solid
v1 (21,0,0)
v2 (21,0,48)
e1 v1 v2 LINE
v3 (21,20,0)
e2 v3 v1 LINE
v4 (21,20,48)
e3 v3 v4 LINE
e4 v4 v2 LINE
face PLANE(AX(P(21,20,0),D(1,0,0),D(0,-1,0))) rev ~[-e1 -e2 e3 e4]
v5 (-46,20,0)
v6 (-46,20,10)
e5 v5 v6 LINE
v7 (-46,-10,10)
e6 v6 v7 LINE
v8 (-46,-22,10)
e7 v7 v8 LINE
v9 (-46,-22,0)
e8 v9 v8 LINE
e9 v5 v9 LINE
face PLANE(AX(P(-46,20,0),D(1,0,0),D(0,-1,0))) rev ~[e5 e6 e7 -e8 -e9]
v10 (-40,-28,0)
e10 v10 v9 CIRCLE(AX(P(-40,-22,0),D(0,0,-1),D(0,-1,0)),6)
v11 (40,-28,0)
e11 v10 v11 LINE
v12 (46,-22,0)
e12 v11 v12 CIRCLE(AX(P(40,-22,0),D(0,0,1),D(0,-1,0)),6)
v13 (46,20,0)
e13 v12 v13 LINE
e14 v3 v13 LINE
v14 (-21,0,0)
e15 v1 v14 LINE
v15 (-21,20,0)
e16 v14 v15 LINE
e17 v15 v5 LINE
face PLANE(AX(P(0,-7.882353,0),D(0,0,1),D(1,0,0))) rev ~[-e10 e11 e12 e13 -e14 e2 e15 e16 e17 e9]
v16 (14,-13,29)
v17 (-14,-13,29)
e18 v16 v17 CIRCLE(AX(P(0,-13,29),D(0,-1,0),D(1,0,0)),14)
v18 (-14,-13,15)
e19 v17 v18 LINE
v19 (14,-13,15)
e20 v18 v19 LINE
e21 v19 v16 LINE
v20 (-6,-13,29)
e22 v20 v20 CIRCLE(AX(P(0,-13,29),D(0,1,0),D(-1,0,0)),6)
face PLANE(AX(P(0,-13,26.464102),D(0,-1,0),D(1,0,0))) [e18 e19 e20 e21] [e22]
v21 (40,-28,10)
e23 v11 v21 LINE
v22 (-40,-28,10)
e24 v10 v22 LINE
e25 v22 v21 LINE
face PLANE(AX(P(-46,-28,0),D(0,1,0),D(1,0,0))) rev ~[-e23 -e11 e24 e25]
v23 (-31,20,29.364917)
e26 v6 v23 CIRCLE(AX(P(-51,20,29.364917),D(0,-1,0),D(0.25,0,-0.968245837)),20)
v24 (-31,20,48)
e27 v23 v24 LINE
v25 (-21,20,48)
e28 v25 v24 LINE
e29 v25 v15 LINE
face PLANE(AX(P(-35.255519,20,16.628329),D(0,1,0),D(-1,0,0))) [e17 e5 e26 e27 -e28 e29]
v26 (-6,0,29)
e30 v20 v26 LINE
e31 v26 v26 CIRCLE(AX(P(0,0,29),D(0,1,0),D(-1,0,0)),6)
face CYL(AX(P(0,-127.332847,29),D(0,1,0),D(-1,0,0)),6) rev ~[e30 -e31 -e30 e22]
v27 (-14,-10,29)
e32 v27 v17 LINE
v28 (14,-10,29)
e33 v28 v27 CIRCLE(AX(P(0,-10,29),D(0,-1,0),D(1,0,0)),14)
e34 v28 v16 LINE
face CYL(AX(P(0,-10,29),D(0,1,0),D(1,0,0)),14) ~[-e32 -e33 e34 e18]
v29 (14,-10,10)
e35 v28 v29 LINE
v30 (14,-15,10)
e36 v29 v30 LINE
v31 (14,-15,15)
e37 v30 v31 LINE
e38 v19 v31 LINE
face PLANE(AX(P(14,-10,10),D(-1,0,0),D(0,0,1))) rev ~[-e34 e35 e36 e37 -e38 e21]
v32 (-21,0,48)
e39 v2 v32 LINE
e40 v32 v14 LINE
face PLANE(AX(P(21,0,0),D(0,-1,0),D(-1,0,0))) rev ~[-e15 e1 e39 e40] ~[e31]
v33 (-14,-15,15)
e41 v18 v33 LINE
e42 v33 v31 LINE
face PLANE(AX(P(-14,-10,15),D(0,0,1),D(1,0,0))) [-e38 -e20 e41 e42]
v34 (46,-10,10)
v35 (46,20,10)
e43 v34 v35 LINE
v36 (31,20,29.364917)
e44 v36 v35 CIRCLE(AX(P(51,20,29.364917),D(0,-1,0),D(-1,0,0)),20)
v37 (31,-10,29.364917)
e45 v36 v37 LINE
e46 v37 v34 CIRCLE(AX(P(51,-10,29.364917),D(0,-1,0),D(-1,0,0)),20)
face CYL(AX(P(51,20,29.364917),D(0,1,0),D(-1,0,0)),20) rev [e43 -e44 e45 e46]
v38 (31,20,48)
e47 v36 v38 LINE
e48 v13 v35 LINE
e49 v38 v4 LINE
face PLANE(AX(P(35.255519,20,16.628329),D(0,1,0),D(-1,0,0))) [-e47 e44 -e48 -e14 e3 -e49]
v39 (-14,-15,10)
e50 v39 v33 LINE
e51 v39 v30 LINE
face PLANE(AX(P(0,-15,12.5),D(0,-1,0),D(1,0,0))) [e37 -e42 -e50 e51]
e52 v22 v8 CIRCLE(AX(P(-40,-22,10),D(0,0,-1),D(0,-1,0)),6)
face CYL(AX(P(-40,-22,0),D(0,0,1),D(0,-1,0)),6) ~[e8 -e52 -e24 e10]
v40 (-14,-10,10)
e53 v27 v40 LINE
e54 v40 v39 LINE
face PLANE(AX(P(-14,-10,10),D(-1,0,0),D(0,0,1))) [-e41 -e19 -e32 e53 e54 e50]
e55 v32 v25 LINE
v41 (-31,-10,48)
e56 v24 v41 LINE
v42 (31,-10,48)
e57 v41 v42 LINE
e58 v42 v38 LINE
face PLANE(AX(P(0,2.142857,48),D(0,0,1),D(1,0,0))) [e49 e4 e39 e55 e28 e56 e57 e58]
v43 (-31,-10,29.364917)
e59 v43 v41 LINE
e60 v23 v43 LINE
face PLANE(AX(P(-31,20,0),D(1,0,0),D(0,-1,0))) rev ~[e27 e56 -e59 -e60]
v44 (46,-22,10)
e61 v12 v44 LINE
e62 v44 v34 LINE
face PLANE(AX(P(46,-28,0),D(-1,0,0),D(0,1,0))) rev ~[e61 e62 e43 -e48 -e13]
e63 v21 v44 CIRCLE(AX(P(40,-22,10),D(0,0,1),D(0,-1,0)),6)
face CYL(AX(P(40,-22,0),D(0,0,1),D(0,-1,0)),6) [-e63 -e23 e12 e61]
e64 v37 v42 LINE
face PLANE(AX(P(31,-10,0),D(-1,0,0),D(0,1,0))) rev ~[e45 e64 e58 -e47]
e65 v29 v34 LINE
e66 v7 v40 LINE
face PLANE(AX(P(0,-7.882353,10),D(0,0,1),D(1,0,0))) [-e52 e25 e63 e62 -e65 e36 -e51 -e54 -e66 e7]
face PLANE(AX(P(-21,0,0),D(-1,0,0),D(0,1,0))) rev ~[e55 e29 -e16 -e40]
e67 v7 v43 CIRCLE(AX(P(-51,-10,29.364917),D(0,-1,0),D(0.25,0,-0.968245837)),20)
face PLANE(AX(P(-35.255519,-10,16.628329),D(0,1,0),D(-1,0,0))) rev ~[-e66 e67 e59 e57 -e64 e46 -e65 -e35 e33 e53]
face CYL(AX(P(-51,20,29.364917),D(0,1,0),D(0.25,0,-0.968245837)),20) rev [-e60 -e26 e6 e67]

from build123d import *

# Parameters (mm, degrees)
F1_DEPTH    = 48
F2_DEPTH    = 10
F3_T1_DEPTH = 30
F4_T1_DEPTH = 30
F6_DEPTH    = 3
F5_W        = 28
F5_H        = 5
F7_DEPTH    = 5
F8_R        = 6
F9_R        = 6
F11_D       = 12


# Not quite as in the source:
# - a fillet or chamfer that OpenCascade refuses, or shapes differently, is made with other operations: its cross-section is extruded or revolved along the edge and cut away or added


with BuildPart() as f1:
    # F0 (on Top) → F1 (new body)
    with BuildSketch(Plane.XY):
        Polygon((-21, 20), (-31, 20), (-31, -10), (31, -10), (31, 20), (21, 20), (21, 0), (-21, 0), align=None)
    extrude(amount=F1_DEPTH)

    # F0 (on Top) → F2 (join)
    with BuildSketch(Plane.XY):
        Polygon((-31, 20), (-46, 20), (-46, -28), (46, -28), (46, 20), (31, 20), (31, -10), (-31, -10), align=None)
        Polygon((-21, 20), (-31, 20), (-31, -10), (31, -10), (31, 20), (21, 20), (21, 0), (-21, 0), align=None)
    extrude(amount=F2_DEPTH)

    # F3: fillet of radius 20 on 1 edges, made by hand

    # F3_s2 → F3_t1 (join)
    with BuildSketch(Plane.XZ.offset(-20)):
        with BuildLine():
            ThreePointArc((31, 29.364916731), (35.1886116992, 17.1174680171), (46, 10))
            Line((46, 10), (31, 10))
            Line((31, 10), (31, 29.364916731))
        make_face()
    extrude(amount=F3_T1_DEPTH)

    # F4: fillet of radius 20 on 1 edges, made by hand

    # F4_s2 → F4_t1 (join)
    with BuildSketch(Plane.XZ.offset(-20)):
        with BuildLine():
            ThreePointArc((-46, 10), (-35.1886116992, 17.1174680171), (-31, 29.364916731))
            Line((-31, 29.364916731), (-31, 10))
            Line((-31, 10), (-46, 10))
        make_face()
    extrude(amount=F4_T1_DEPTH)

    # F5 (on face) → F6 (join)
    with BuildSketch(Plane.XZ.offset(10)):
        with BuildLine():
            Line((-14, 29), (-14, 15))
            Line((-14, 15), (14, 15))
            Line((14, 15), (14, 29))
            ThreePointArc((14, 29), (0, 43), (-14, 29))
        make_face()
    extrude(amount=F6_DEPTH)

    # F5 (on face) → F7 (join)
    with BuildSketch(Plane.XZ.offset(10)):
        with Locations((0, 12.5)):
            Rectangle(F5_W, F5_H)
    extrude(amount=F7_DEPTH)

    # F8
    f8_edges = [f1.edges().sort_by_distance(p)[0] for p in [
        (46, -28, 5),
    ]]
    fillet(f8_edges, radius=F8_R)

    # F9
    f9_edges = [f1.edges().sort_by_distance(p)[0] for p in [
        (-46, -28, 5),
    ]]
    fillet(f9_edges, radius=F9_R)

    # F11 (through all)
    with Locations(Plane.XZ.offset(13)):
        with Locations((0, 29)):
            Hole(F11_D / 2)


solid = f1.part
